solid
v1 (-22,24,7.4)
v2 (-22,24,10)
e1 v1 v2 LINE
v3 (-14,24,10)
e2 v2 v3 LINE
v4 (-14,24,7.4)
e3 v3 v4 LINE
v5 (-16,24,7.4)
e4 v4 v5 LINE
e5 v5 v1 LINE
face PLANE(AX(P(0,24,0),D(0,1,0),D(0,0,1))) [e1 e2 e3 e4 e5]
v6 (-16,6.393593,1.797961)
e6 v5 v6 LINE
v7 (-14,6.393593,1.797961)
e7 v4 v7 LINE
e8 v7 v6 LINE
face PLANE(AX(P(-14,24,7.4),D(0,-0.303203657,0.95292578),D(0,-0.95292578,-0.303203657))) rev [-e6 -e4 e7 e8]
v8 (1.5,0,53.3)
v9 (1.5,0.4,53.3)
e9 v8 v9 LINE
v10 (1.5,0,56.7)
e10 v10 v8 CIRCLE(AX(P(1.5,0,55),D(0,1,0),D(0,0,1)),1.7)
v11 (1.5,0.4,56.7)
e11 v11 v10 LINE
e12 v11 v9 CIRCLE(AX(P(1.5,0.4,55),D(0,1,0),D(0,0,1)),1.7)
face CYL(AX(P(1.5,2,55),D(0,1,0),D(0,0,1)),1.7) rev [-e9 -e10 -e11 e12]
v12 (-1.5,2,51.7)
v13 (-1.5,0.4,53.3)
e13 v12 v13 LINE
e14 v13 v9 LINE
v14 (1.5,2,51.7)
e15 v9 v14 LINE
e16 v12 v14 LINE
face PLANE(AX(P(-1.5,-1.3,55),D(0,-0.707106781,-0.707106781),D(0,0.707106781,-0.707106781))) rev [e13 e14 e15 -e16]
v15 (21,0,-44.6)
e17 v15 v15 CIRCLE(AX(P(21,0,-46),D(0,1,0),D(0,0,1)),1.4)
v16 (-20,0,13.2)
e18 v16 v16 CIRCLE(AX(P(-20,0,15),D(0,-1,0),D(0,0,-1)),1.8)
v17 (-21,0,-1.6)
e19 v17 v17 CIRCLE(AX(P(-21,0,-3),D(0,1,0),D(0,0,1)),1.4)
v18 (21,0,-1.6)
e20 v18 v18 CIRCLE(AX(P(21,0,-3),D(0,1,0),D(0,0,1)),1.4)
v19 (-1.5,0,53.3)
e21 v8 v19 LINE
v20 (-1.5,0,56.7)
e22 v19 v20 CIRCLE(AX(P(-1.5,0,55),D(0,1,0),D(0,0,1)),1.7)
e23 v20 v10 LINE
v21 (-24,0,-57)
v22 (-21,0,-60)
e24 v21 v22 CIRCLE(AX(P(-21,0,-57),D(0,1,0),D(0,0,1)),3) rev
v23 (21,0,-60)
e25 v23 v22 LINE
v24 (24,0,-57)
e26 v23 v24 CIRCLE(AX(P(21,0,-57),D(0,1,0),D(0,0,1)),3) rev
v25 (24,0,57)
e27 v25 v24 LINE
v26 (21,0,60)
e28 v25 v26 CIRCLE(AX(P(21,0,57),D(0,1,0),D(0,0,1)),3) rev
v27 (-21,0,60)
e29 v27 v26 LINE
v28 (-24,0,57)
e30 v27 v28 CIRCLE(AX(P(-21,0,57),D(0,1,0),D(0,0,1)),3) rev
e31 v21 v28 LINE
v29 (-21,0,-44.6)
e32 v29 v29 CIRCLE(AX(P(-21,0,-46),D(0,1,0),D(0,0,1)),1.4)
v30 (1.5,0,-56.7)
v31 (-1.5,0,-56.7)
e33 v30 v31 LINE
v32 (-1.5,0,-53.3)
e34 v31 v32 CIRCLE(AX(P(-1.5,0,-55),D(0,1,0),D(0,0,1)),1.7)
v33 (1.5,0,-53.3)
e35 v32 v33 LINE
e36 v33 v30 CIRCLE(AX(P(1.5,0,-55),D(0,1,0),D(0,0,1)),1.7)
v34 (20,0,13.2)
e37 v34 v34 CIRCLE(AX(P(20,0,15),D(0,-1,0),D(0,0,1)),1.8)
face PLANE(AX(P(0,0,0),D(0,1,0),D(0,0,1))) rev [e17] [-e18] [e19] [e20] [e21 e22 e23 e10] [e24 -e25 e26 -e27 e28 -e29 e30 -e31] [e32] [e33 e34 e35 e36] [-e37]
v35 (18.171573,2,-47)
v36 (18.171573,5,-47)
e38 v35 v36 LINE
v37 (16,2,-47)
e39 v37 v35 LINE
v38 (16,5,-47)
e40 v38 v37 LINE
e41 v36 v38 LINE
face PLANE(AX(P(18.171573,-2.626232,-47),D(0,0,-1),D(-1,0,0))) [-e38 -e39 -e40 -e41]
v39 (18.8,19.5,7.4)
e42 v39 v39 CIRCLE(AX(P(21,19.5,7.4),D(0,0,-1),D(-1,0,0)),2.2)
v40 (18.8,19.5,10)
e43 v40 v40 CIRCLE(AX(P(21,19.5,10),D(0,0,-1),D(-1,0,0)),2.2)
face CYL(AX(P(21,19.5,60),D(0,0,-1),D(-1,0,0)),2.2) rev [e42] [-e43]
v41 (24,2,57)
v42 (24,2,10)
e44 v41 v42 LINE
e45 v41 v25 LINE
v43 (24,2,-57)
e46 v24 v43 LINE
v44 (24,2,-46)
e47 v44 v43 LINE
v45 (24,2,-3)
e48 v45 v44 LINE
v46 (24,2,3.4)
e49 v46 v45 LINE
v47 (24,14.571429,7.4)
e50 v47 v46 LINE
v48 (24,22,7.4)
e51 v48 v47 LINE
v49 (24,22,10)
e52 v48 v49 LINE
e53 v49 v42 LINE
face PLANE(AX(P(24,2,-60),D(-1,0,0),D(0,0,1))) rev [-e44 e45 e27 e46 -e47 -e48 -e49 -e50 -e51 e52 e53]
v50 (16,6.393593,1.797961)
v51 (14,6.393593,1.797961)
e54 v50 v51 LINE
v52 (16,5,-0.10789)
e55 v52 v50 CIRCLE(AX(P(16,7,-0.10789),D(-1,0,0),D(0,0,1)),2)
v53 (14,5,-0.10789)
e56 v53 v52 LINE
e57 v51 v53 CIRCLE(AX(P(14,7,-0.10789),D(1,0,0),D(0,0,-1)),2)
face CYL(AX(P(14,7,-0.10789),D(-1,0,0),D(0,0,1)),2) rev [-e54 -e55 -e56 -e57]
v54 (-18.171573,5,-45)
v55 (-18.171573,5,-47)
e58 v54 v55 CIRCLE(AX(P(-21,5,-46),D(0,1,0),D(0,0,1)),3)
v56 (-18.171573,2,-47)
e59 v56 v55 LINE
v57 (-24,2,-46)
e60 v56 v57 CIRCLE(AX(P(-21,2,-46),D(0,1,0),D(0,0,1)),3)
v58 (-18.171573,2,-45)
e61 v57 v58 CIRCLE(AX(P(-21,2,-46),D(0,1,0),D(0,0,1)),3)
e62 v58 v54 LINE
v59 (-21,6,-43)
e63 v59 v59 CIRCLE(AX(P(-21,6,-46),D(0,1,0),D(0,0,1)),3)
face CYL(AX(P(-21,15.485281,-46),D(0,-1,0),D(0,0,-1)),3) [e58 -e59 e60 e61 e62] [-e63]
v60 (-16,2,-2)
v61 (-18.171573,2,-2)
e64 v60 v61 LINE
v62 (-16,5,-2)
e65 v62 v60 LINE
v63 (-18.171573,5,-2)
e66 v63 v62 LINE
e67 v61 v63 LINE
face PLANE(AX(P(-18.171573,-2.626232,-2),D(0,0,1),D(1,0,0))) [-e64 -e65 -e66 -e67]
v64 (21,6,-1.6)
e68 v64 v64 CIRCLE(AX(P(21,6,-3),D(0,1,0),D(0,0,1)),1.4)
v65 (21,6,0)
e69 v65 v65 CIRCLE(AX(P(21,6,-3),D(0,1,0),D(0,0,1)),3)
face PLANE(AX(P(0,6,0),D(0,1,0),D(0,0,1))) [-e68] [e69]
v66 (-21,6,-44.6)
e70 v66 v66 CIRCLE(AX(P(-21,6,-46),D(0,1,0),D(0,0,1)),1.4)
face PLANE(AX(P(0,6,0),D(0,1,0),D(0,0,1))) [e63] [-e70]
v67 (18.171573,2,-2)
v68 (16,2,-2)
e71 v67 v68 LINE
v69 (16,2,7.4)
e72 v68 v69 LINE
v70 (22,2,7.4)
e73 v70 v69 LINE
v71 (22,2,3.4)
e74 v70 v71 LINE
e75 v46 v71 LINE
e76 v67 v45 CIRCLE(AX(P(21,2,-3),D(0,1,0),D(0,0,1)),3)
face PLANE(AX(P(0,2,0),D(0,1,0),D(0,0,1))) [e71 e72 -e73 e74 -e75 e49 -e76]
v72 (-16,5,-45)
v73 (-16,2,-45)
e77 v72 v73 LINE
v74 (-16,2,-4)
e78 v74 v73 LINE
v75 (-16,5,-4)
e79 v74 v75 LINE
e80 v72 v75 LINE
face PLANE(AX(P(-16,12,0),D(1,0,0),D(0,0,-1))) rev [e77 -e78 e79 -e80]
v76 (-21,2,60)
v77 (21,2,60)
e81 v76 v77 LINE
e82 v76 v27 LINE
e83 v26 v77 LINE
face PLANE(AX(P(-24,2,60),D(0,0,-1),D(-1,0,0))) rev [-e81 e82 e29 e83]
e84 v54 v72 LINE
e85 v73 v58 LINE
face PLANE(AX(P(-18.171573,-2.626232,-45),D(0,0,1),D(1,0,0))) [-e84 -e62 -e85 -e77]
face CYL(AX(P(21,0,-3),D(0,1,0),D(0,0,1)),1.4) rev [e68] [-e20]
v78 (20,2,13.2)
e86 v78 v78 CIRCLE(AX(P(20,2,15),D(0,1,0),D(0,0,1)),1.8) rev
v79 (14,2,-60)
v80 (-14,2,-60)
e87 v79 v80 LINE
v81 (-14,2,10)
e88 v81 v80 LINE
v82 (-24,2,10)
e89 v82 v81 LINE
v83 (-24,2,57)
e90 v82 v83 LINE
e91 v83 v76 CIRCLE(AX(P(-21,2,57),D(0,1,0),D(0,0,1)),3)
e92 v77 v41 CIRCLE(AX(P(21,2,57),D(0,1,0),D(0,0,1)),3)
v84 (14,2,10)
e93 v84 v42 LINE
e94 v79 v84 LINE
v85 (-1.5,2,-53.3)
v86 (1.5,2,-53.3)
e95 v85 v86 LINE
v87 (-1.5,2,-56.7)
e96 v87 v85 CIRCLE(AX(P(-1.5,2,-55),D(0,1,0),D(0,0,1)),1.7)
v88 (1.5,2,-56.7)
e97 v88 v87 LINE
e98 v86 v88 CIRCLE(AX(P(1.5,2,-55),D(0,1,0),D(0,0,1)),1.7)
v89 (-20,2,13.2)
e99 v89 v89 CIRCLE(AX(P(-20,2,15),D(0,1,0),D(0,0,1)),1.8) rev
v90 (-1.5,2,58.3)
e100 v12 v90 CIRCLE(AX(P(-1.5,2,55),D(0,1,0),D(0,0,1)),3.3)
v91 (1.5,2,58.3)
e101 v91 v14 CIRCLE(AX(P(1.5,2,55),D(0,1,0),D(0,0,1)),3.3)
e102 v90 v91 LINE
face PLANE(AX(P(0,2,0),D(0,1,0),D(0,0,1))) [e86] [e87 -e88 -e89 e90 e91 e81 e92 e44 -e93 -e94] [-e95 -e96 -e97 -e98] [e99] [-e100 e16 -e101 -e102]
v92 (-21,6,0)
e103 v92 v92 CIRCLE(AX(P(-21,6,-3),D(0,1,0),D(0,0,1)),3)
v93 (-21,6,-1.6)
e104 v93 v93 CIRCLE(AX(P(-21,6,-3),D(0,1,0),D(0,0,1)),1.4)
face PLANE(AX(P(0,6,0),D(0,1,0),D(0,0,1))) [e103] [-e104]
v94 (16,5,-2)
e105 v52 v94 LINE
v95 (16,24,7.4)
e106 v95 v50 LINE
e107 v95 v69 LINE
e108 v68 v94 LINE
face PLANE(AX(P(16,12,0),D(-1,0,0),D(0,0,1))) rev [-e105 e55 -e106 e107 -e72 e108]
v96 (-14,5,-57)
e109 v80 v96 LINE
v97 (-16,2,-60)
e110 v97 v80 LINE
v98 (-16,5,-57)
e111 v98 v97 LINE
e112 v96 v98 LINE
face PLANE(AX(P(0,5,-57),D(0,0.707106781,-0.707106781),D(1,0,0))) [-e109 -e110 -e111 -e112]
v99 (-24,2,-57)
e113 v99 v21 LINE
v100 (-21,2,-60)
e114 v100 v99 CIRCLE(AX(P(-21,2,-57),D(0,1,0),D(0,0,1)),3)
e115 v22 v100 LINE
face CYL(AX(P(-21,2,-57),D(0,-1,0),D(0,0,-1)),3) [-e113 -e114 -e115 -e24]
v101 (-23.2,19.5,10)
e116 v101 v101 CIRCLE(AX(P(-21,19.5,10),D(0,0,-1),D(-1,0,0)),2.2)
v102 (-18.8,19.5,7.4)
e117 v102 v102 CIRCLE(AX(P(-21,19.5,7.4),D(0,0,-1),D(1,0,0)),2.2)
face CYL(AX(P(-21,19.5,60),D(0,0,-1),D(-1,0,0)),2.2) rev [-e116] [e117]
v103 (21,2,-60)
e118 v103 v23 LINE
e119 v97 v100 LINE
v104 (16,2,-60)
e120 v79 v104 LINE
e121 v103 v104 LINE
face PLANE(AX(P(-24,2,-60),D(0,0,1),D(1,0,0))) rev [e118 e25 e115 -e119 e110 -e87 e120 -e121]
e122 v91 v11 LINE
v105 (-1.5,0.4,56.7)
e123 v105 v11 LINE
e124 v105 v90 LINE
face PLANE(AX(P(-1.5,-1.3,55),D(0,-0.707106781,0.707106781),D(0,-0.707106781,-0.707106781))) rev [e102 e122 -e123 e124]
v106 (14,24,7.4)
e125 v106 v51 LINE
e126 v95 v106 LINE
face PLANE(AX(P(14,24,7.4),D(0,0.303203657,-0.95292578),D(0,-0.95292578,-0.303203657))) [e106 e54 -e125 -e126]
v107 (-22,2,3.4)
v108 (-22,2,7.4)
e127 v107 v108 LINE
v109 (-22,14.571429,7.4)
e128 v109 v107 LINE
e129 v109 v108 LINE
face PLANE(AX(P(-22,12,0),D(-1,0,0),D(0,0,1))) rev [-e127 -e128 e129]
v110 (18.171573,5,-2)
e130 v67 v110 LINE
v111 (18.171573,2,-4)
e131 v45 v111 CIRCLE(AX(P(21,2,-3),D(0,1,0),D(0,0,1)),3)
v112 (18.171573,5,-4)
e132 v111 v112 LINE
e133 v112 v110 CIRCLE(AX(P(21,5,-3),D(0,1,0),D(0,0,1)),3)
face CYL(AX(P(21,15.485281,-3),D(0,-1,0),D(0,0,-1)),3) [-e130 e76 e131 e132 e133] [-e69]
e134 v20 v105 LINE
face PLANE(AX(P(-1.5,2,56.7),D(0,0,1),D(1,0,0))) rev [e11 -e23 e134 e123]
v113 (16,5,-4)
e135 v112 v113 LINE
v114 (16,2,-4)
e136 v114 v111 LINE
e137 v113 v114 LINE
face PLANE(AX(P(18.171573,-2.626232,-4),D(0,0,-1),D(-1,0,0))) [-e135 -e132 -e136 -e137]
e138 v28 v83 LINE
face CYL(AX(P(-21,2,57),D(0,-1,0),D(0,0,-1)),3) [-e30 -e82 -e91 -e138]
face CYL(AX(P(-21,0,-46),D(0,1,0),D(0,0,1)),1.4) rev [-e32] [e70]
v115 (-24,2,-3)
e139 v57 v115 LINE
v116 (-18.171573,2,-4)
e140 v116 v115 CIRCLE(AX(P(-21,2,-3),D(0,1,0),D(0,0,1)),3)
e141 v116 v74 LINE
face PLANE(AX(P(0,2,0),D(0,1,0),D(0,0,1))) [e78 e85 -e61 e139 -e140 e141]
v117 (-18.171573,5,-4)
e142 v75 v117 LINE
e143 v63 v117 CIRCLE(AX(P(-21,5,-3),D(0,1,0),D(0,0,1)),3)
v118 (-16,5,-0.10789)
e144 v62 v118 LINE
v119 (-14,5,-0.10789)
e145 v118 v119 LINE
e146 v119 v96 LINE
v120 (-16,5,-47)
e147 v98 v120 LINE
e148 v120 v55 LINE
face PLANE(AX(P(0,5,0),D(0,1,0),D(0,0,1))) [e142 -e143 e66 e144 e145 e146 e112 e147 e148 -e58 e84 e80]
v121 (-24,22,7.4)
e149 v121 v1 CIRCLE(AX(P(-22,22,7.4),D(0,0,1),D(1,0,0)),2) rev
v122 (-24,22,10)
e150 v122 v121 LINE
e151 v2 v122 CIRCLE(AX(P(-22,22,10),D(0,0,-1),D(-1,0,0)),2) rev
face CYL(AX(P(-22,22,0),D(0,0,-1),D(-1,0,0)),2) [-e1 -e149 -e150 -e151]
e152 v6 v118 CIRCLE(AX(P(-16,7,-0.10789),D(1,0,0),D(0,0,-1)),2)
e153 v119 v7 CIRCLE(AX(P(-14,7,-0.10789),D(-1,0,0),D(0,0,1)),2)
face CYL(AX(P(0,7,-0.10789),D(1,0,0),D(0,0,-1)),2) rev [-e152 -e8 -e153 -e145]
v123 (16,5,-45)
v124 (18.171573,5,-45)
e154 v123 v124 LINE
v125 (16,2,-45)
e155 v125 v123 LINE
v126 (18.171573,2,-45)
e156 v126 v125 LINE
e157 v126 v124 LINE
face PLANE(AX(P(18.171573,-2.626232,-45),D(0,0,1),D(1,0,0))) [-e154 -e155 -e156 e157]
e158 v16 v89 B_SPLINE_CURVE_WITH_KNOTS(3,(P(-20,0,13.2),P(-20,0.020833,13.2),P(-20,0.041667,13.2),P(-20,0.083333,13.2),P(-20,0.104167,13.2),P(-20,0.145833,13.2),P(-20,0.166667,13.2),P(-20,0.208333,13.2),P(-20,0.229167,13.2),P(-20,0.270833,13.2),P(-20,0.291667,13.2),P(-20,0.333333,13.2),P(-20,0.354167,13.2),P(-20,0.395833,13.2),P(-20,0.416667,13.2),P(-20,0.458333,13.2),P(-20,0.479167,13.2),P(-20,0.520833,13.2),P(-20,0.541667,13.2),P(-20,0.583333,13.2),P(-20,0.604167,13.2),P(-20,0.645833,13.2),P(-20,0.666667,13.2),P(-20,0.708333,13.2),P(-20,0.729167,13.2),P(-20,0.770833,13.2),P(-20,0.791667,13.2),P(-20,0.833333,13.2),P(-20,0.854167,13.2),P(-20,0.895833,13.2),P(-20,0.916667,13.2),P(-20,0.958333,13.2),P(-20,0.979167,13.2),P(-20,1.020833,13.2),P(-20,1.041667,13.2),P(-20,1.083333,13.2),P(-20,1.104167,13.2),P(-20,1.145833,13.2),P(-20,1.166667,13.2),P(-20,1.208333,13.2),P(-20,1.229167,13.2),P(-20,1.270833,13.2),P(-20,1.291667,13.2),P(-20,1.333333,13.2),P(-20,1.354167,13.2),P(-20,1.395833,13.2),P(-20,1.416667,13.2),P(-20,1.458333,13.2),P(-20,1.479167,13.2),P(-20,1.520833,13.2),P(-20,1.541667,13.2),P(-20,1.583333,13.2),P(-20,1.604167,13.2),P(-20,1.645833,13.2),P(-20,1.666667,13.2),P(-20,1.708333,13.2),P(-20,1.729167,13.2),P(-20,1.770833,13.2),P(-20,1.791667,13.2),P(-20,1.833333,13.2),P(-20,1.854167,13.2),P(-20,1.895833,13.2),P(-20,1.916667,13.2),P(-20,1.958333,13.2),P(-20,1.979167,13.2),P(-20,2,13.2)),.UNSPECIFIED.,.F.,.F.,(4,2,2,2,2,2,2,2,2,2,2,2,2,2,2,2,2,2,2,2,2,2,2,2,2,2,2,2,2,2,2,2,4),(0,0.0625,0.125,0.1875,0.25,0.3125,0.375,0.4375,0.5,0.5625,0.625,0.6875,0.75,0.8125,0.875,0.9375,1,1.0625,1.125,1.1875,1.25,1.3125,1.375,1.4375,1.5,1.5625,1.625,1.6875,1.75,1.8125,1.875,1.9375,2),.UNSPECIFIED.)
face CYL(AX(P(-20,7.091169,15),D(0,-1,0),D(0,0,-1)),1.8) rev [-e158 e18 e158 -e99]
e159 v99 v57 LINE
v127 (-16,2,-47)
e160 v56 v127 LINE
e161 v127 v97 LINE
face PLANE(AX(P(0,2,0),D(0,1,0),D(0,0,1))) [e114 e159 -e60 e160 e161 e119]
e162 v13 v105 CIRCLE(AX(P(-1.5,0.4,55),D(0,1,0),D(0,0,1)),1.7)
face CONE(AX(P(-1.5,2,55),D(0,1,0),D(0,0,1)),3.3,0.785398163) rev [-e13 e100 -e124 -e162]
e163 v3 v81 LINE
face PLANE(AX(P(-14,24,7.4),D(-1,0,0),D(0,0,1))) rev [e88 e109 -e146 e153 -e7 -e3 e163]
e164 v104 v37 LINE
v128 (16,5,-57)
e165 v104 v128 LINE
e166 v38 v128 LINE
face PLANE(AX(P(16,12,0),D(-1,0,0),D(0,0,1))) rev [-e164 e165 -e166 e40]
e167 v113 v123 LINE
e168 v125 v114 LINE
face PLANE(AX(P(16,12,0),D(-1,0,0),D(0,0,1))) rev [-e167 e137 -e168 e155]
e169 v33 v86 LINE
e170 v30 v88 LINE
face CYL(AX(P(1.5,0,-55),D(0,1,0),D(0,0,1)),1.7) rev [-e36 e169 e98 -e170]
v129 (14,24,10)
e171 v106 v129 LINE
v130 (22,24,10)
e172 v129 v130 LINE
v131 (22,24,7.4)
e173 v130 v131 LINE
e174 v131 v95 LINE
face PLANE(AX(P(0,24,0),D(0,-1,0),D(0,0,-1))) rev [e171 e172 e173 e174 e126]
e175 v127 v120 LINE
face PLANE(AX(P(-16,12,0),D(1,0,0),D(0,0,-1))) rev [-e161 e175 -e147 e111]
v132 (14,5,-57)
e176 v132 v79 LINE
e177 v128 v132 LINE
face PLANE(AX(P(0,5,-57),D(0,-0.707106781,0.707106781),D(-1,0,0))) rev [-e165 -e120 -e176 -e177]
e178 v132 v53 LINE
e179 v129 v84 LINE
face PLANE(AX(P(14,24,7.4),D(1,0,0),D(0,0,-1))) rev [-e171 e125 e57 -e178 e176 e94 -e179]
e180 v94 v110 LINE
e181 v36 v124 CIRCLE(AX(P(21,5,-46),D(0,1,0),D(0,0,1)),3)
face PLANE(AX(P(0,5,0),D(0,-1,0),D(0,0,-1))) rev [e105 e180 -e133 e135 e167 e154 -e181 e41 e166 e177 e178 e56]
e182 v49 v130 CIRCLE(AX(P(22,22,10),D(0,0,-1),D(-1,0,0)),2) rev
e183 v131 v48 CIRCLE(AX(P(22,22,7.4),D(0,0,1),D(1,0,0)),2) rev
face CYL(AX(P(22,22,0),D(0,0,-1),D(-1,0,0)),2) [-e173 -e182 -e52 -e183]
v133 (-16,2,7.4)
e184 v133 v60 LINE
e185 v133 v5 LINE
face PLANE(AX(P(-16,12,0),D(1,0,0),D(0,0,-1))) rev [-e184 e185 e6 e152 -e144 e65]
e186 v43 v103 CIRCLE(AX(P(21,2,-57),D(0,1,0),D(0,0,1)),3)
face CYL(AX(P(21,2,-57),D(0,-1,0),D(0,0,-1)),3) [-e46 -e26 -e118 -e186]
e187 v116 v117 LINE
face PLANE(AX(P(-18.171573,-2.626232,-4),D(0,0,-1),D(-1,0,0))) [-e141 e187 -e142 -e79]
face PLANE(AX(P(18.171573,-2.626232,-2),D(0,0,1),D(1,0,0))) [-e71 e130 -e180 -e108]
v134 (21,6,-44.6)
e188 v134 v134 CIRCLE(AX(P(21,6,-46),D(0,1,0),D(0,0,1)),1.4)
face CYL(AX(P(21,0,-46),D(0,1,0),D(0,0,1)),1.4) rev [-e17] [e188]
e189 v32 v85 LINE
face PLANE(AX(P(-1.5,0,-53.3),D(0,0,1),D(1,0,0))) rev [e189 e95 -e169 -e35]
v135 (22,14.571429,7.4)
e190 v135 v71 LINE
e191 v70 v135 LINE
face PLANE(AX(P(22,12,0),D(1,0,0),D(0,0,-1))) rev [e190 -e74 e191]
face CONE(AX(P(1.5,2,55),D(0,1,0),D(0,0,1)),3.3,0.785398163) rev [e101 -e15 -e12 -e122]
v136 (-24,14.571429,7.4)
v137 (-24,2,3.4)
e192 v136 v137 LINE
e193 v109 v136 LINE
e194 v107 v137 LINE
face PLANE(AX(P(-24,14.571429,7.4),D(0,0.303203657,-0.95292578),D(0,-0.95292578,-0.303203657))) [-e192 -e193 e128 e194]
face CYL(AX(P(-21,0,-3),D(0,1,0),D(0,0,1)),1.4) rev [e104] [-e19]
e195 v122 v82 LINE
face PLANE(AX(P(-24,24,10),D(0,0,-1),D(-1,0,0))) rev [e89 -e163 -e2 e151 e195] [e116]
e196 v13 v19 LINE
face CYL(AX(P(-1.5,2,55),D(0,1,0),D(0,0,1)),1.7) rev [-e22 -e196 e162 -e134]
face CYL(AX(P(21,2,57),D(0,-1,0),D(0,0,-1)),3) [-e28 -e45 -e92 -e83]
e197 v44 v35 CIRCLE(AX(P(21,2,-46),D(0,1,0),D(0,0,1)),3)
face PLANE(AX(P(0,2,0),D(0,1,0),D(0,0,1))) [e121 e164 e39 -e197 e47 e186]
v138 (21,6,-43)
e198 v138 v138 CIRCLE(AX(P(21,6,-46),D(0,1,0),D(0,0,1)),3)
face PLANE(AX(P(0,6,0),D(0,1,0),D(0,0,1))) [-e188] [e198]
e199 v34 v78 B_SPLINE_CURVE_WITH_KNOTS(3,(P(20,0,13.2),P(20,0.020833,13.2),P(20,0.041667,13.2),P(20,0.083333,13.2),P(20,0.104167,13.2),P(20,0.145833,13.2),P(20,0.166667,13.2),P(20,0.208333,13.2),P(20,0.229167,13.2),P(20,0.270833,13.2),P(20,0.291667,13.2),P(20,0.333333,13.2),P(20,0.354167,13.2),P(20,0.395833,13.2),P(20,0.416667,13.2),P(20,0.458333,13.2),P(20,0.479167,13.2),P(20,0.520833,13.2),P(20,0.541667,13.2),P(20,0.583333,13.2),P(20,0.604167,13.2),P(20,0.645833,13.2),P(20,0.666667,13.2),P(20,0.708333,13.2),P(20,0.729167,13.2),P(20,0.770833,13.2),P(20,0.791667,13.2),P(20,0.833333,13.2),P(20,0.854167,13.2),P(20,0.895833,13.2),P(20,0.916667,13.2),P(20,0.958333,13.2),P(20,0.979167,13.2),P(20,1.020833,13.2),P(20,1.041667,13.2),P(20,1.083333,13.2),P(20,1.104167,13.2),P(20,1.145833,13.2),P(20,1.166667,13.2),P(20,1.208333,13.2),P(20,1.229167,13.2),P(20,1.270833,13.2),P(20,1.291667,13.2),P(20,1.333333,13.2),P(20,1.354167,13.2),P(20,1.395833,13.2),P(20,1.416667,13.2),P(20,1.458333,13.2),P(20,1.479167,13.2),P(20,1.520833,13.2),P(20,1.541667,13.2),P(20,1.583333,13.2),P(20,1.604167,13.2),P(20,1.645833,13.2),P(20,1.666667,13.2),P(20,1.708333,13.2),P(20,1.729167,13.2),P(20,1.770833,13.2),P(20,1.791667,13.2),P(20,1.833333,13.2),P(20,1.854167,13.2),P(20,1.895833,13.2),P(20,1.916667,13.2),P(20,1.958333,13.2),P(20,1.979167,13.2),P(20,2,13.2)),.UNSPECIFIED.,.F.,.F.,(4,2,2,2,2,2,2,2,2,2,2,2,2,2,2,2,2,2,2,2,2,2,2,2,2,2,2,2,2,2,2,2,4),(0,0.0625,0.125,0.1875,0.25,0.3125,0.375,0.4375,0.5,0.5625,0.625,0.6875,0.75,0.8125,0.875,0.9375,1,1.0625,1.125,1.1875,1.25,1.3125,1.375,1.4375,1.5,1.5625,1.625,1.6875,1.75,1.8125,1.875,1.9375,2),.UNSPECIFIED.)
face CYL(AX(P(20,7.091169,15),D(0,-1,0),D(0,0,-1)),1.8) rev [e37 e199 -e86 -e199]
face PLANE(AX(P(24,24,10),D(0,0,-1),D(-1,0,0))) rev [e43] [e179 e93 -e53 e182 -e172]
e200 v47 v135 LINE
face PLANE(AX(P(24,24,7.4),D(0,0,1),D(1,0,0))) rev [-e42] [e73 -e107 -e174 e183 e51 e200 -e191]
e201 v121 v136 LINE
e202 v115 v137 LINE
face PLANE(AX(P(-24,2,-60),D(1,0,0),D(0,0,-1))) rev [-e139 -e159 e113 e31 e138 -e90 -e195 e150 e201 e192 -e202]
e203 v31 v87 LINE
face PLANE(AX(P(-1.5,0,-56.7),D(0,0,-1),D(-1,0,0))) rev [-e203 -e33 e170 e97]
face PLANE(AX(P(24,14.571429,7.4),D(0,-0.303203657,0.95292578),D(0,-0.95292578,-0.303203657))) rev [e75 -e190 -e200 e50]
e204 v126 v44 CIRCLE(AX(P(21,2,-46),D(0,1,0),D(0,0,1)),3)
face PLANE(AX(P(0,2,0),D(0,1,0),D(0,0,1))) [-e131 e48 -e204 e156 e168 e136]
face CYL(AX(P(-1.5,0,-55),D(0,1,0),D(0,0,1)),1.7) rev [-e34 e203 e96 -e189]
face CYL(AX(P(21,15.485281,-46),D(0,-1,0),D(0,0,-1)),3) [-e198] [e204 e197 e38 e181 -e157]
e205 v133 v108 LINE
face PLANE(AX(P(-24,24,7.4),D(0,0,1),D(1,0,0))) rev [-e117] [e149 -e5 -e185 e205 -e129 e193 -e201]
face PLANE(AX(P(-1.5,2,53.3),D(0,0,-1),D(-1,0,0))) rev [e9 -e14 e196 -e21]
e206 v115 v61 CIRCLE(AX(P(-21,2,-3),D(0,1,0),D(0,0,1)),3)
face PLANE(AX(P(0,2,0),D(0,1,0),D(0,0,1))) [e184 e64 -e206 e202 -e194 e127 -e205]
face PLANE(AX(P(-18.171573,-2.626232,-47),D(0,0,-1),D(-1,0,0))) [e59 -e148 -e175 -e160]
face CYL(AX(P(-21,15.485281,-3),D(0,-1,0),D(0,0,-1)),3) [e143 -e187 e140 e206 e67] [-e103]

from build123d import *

# Parameters (mm, degrees)
SKETCH_1_W             = 48
SKETCH_1_H             = 120
EXTRUDE_1_DEPTH        = 2
SKETCH_2_R             = 1.7
CUT_EXTRUDE_1_DEPTH    = 65.652919501
FILLET_1_R             = 3
SKETCH_3_R             = 1.8
CUT_EXTRUDE_2_DEPTH    = 2
SKETCH_4_W             = 10
SKETCH_4_H             = 2.6
EXTRUDE_2_DEPTH        = 22
RIB_6_REACH            = 76.967
SKETCH_5_WALL_W        = 175.020111274
SKETCH_5_WALL_H        = 2
SKETCH_6_R             = 2.2
CUT_EXTRUDE_3_DEPTH    = 76.463633626
FILLET_2_R             = 2
RIB_START              = -2
RIB_7_DEPTH            = 2
SKETCH_9_R             = 1.4
CUT_EXTRUDE_4_DEPTH    = 69.264192664
SKETCH_10_W            = 2
SKETCH_10_H            = 61.770189923
EXTRUDE_3_DEPTH        = 3
FILLET_3_R             = 2
CHAMFER_2_SIZE         = 3
HOLE_START             = -1
HOLE_WIZARD_M3_1_DEPTH = 4
EXTRUDE_START          = 4
SKETCH_14_R            = 3
SKETCH_14_R_2          = 1.4
EXTRUDE_4_DEPTH        = 4
SKETCH_15_W            = 4.171572875
SKETCH_15_H            = 2
EXTRUDE_5_DEPTH        = 3


with BuildPart() as part:
    # 草图1 → 凸台-拉伸1 (new body)
    with BuildSketch(Plane(origin=(0, 0, 0), x_dir=(1, 0, 0), z_dir=(0, 1, 0))):
        Rectangle(SKETCH_1_W, SKETCH_1_H)
    extrude(amount=EXTRUDE_1_DEPTH)

    # 草图2 → 切除-拉伸1 (cut, through all)
    with BuildSketch(Plane(origin=(0, 2, 0), x_dir=(1, 0, 0), z_dir=(0, 1, 0))):
        with Locations(Location((0, -55, 0), (0, 0, 90))):
            Circle(SKETCH_2_R)
        with BuildLine():
            Line((-1.5, 56.7), (1.5, 56.7))
            ThreePointArc((1.5, 56.7), (3.2, 55), (1.5, 53.3))
            Line((1.5, 53.3), (-1.5, 53.3))
            ThreePointArc((-1.5, 53.3), (-3.2, 55), (-1.5, 56.7))
        make_face()
    extrude(amount=-CUT_EXTRUDE_1_DEPTH, mode=Mode.SUBTRACT)

    # 圆角1
    fillet_1_edges = [part.edges().sort_by_distance(p)[0] for p in [
        (24, 1, 60),
        (-24, 1, 60),
        (-24, 1, -60),
        (24, 1, -60),
    ]]
    fillet(fillet_1_edges, radius=FILLET_1_R)

    # 草图3 → 切除-拉伸2 (cut)
    with BuildSketch(Plane(origin=(0, 0, 0), x_dir=(-1, 0, 0), z_dir=(0, -1, 0))):
        with Locations(Location((20, -15, 0), (0, 0, 90))):
            Circle(SKETCH_3_R)
        with Locations(Location((-20, -15, 0), (0, 0, 90))):
            Circle(SKETCH_3_R)
    extrude(amount=-CUT_EXTRUDE_2_DEPTH, mode=Mode.SUBTRACT)

    # 草图4 → 凸台-拉伸2 (add)
    with BuildSketch(Plane(origin=(0, 2, 0), x_dir=(1, 0, 0), z_dir=(0, 1, 0))):
        with Locations((19, -8.7)):
            Rectangle(SKETCH_4_W, SKETCH_4_H)
        with Locations((-19, -8.7)):
            Rectangle(SKETCH_4_W, SKETCH_4_H)
    extrude(amount=EXTRUDE_2_DEPTH)

    # 草图5 wall → 筋6 (add, up to next)
    with BuildSketch(Plane(origin=(14, 13, 3.9), x_dir=(0, -0.952925780013, -0.303203657277), z_dir=(0, -0.303203657277, 0.952925780013)), mode=Mode.PRIVATE) as rib_6_sk1:
        with Locations((0, 1)):
            Rectangle(SKETCH_5_WALL_W, SKETCH_5_WALL_H)
    rib_6_tool1 = extrude(rib_6_sk1.sketch, amount=RIB_6_REACH, mode=Mode.PRIVATE) - part.part
    rib_6 = rib_6_tool1.solids().sort_by_distance((14, 13, 3.9))[0]
    add(rib_6)

    # 镜向1: 筋6 across plane
    add(rib_6.mirror(Plane(origin=(0, 0, 0), x_dir=(0, 0, 1), z_dir=(1, 0, 0))))

    # 草图6 → 切除-拉伸3 (cut, through all)
    with BuildSketch(Plane(origin=(0, 0, 7.4), x_dir=(-1, 0, 0), z_dir=(0, 0, -1))):
        with Locations((-21, 19.5)):
            Circle(SKETCH_6_R)
        with Locations((21, 19.5)):
            Circle(SKETCH_6_R)
    extrude(amount=-CUT_EXTRUDE_3_DEPTH, mode=Mode.SUBTRACT)

    # 圆角2
    fillet_2_edges = [part.edges().sort_by_distance(p)[0] for p in [
        (24, 24, 8.7),
        (-24, 24, 8.7),
    ]]
    fillet(fillet_2_edges, radius=FILLET_2_R)

    # 筋7: read off the stored shape, not the designer's step
    # 筋7 outline → 筋7 (add)
    with BuildSketch(Plane(origin=(24, 0, 0), x_dir=(0, 0, -1), z_dir=(1, 0, 0)).offset(RIB_START)):
        Polygon((-3.4, 2), (-7.4, 14.571428571), (-7.4, 2), align=None)
    rib_7 = extrude(amount=RIB_7_DEPTH)

    # 镜向2: 筋7 across plane
    add(rib_7.mirror(Plane(origin=(0, 0, 0), x_dir=(0, 0, 1), z_dir=(1, 0, 0))))

    # 草图9 → 切除-拉伸4 (cut, through all)
    with BuildSketch(Plane(origin=(0, 2, 0), x_dir=(1, 0, 0), z_dir=(0, 1, 0))):
        with Locations(Location((-21, 46, 0), (0, 0, 270))):
            Circle(SKETCH_9_R)
        with Locations(Location((21, 46, 0), (0, 0, 270))):
            Circle(SKETCH_9_R)
        with Locations(Location((21, 3, 0), (0, 0, 270))):
            Circle(SKETCH_9_R)
        with Locations(Location((-21, 3, 0), (0, 0, 270))):
            Circle(SKETCH_9_R)
    extrude(amount=-CUT_EXTRUDE_4_DEPTH, mode=Mode.SUBTRACT)

    # 草图10 → 凸台-拉伸3 (add)
    with BuildSketch(Plane(origin=(0, 2, 0), x_dir=(1, 0, 0), z_dir=(0, 1, 0))):
        with Locations((-15, 29.114905039)):
            Rectangle(SKETCH_10_W, SKETCH_10_H)
        with Locations((15, 29.114905039)):
            Rectangle(SKETCH_10_W, SKETCH_10_H)
    extrude(amount=EXTRUDE_3_DEPTH)

    # 圆角3
    fillet_3_edges = [part.edges().sort_by_distance(p)[0] for p in [
        (-15, 5, 1.354545455),
        (15, 5, 1.354545455),
    ]]
    fillet(fillet_3_edges, radius=FILLET_3_R)

    # 倒角2
    chamfer_2_edges = [part.edges().sort_by_distance(p)[0] for p in [
        (15, 5, -60),
        (-15, 5, -60),
    ]]
    chamfer(chamfer_2_edges, length=CHAMFER_2_SIZE)

    # M3 十字槽沉头木螺钉的锥形沉头孔1: read off the stored shape, not the designer's step
    # M3 十字槽沉头木螺钉的锥形沉头孔1 outline → M3 十字槽沉头木螺钉的锥形沉头孔1 (cut)
    with BuildSketch(Plane(origin=(0, 0, 0), x_dir=(1, 0, 0), z_dir=(0, 1, 0)).offset(HOLE_START)):
        with BuildLine():
            Line((0, -56.7), (1.5, -56.7))
            ThreePointArc((1.5, -56.7), (3.2, -55), (1.5, -53.3))
            Line((1.5, -53.3), (0, -53.3))
            ThreePointArc((0, -53.3), (1.7, -55), (0, -56.7))
        make_face()
        with BuildLine():
            Line((-1.5, -56.7), (0, -56.7))
            ThreePointArc((0, -56.7), (-1.7, -55), (0, -53.3))
            Line((0, -53.3), (-1.5, -53.3))
            ThreePointArc((-1.5, -53.3), (-3.2, -55), (-1.5, -56.7))
        make_face()
    extrude(amount=HOLE_WIZARD_M3_1_DEPTH, mode=Mode.SUBTRACT)

    # Hole Wizard M3 _1 2: loft between two sections, ruled curve by curve
    hole_wizard_m3_1_2_from = [
        Edge.make_three_point_arc((1.5, 0.4, 56.7), (2.702081528, 0.4, 56.202081528), (3.2, 0.4, 55)),
        Edge.make_three_point_arc((3.2, 0.4, 55), (2.702081528, 0.4, 53.797918472), (1.5, 0.4, 53.3)),
        Edge.make_three_point_arc((-1.5, 0.4, 53.3), (-2.702081528, 0.4, 53.797918472), (-3.2, 0.4, 55)),
        Edge.make_three_point_arc((-3.2, 0.4, 55), (-2.702081528, 0.4, 56.202081528), (-1.5, 0.4, 56.7)),
        Edge.make_line((1.5, 0.4, 53.3), (-1.5, 0.4, 53.3)),
        Edge.make_line((1.5, 0.4, 56.7), (-1.5, 0.4, 56.7)),
    ]
    hole_wizard_m3_1_2_to = [
        Edge.make_three_point_arc((1.5, 2, 58.3), (3.833452378, 2, 57.333452378), (4.8, 2, 55)),
        Edge.make_three_point_arc((4.8, 2, 55), (3.833452378, 2, 52.666547622), (1.5, 2, 51.7)),
        Edge.make_three_point_arc((-1.5, 2, 51.7), (-3.833452378, 2, 52.666547622), (-4.8, 2, 55)),
        Edge.make_three_point_arc((-4.8, 2, 55), (-3.833452378, 2, 57.333452378), (-1.5, 2, 58.3)),
        Edge.make_line((1.5, 2, 51.7), (-1.5, 2, 51.7)),
        Edge.make_line((1.5, 2, 58.3), (-1.5, 2, 58.3)),
    ]
    hole_wizard_m3_1_2 = Solid(Shell([*[Face.make_surface_from_curves(hole_wizard_m3_1_2_from[k], hole_wizard_m3_1_2_to[k]) for k in range(6)], Face(Wire(hole_wizard_m3_1_2_from)), Face(Wire(hole_wizard_m3_1_2_to))]))
    add(hole_wizard_m3_1_2, mode=Mode.SUBTRACT)

    # 草图14 → 凸台-拉伸4 (add)
    # profile 1 of 4: a face of its own
    with BuildSketch(Plane(origin=(0, 2, 0), x_dir=(1, 0, 0), z_dir=(0, 1, 0)).offset(EXTRUDE_START)):
        with Locations(Location((-21, 46, 0), (0, 0, 180))):
            Circle(SKETCH_14_R)
        with Locations(Location((-21, 46, 0), (0, 0, 270))):
            Circle(SKETCH_14_R_2, mode=Mode.SUBTRACT)
    # profile 2 of 4: a face of its own
    with BuildSketch(Plane(origin=(0, 2, 0), x_dir=(1, 0, 0), z_dir=(0, 1, 0)).offset(EXTRUDE_START)):
        with Locations(Location((-21, 3, 0), (0, 0, 180))):
            Circle(SKETCH_14_R)
        with Locations(Location((-21, 3, 0), (0, 0, 270))):
            Circle(SKETCH_14_R_2, mode=Mode.SUBTRACT)
    # profile 3 of 4: a face of its own
    with BuildSketch(Plane(origin=(0, 2, 0), x_dir=(1, 0, 0), z_dir=(0, 1, 0)).offset(EXTRUDE_START)):
        with Locations((21, 46)):
            Circle(SKETCH_14_R)
        with Locations(Location((21, 46, 0), (0, 0, 270))):
            Circle(SKETCH_14_R_2, mode=Mode.SUBTRACT)
    # profile 4 of 4: a face of its own
    with BuildSketch(Plane(origin=(0, 2, 0), x_dir=(1, 0, 0), z_dir=(0, 1, 0)).offset(EXTRUDE_START)):
        with Locations((21, 3)):
            Circle(SKETCH_14_R)
        with Locations(Location((21, 3, 0), (0, 0, 270))):
            Circle(SKETCH_14_R_2, mode=Mode.SUBTRACT)
    extrude(amount=-EXTRUDE_4_DEPTH)

    # 草图15 → 凸台-拉伸5 (add)
    with BuildSketch(Plane(origin=(0, 5, 0), x_dir=(1, 0, 0), z_dir=(0, 1, 0))):
        with Locations((-16.085786438, 46)):
            Rectangle(SKETCH_15_W, SKETCH_15_H)
        with Locations((-16.085786438, 3)):
            Rectangle(SKETCH_15_W, SKETCH_15_H)
        with Locations((16.085786438, 3)):
            Rectangle(SKETCH_15_W, SKETCH_15_H)
        with Locations((16.085786438, 46)):
            Rectangle(SKETCH_15_W, SKETCH_15_H)
    extrude(amount=-EXTRUDE_5_DEPTH)


solid = part.part
